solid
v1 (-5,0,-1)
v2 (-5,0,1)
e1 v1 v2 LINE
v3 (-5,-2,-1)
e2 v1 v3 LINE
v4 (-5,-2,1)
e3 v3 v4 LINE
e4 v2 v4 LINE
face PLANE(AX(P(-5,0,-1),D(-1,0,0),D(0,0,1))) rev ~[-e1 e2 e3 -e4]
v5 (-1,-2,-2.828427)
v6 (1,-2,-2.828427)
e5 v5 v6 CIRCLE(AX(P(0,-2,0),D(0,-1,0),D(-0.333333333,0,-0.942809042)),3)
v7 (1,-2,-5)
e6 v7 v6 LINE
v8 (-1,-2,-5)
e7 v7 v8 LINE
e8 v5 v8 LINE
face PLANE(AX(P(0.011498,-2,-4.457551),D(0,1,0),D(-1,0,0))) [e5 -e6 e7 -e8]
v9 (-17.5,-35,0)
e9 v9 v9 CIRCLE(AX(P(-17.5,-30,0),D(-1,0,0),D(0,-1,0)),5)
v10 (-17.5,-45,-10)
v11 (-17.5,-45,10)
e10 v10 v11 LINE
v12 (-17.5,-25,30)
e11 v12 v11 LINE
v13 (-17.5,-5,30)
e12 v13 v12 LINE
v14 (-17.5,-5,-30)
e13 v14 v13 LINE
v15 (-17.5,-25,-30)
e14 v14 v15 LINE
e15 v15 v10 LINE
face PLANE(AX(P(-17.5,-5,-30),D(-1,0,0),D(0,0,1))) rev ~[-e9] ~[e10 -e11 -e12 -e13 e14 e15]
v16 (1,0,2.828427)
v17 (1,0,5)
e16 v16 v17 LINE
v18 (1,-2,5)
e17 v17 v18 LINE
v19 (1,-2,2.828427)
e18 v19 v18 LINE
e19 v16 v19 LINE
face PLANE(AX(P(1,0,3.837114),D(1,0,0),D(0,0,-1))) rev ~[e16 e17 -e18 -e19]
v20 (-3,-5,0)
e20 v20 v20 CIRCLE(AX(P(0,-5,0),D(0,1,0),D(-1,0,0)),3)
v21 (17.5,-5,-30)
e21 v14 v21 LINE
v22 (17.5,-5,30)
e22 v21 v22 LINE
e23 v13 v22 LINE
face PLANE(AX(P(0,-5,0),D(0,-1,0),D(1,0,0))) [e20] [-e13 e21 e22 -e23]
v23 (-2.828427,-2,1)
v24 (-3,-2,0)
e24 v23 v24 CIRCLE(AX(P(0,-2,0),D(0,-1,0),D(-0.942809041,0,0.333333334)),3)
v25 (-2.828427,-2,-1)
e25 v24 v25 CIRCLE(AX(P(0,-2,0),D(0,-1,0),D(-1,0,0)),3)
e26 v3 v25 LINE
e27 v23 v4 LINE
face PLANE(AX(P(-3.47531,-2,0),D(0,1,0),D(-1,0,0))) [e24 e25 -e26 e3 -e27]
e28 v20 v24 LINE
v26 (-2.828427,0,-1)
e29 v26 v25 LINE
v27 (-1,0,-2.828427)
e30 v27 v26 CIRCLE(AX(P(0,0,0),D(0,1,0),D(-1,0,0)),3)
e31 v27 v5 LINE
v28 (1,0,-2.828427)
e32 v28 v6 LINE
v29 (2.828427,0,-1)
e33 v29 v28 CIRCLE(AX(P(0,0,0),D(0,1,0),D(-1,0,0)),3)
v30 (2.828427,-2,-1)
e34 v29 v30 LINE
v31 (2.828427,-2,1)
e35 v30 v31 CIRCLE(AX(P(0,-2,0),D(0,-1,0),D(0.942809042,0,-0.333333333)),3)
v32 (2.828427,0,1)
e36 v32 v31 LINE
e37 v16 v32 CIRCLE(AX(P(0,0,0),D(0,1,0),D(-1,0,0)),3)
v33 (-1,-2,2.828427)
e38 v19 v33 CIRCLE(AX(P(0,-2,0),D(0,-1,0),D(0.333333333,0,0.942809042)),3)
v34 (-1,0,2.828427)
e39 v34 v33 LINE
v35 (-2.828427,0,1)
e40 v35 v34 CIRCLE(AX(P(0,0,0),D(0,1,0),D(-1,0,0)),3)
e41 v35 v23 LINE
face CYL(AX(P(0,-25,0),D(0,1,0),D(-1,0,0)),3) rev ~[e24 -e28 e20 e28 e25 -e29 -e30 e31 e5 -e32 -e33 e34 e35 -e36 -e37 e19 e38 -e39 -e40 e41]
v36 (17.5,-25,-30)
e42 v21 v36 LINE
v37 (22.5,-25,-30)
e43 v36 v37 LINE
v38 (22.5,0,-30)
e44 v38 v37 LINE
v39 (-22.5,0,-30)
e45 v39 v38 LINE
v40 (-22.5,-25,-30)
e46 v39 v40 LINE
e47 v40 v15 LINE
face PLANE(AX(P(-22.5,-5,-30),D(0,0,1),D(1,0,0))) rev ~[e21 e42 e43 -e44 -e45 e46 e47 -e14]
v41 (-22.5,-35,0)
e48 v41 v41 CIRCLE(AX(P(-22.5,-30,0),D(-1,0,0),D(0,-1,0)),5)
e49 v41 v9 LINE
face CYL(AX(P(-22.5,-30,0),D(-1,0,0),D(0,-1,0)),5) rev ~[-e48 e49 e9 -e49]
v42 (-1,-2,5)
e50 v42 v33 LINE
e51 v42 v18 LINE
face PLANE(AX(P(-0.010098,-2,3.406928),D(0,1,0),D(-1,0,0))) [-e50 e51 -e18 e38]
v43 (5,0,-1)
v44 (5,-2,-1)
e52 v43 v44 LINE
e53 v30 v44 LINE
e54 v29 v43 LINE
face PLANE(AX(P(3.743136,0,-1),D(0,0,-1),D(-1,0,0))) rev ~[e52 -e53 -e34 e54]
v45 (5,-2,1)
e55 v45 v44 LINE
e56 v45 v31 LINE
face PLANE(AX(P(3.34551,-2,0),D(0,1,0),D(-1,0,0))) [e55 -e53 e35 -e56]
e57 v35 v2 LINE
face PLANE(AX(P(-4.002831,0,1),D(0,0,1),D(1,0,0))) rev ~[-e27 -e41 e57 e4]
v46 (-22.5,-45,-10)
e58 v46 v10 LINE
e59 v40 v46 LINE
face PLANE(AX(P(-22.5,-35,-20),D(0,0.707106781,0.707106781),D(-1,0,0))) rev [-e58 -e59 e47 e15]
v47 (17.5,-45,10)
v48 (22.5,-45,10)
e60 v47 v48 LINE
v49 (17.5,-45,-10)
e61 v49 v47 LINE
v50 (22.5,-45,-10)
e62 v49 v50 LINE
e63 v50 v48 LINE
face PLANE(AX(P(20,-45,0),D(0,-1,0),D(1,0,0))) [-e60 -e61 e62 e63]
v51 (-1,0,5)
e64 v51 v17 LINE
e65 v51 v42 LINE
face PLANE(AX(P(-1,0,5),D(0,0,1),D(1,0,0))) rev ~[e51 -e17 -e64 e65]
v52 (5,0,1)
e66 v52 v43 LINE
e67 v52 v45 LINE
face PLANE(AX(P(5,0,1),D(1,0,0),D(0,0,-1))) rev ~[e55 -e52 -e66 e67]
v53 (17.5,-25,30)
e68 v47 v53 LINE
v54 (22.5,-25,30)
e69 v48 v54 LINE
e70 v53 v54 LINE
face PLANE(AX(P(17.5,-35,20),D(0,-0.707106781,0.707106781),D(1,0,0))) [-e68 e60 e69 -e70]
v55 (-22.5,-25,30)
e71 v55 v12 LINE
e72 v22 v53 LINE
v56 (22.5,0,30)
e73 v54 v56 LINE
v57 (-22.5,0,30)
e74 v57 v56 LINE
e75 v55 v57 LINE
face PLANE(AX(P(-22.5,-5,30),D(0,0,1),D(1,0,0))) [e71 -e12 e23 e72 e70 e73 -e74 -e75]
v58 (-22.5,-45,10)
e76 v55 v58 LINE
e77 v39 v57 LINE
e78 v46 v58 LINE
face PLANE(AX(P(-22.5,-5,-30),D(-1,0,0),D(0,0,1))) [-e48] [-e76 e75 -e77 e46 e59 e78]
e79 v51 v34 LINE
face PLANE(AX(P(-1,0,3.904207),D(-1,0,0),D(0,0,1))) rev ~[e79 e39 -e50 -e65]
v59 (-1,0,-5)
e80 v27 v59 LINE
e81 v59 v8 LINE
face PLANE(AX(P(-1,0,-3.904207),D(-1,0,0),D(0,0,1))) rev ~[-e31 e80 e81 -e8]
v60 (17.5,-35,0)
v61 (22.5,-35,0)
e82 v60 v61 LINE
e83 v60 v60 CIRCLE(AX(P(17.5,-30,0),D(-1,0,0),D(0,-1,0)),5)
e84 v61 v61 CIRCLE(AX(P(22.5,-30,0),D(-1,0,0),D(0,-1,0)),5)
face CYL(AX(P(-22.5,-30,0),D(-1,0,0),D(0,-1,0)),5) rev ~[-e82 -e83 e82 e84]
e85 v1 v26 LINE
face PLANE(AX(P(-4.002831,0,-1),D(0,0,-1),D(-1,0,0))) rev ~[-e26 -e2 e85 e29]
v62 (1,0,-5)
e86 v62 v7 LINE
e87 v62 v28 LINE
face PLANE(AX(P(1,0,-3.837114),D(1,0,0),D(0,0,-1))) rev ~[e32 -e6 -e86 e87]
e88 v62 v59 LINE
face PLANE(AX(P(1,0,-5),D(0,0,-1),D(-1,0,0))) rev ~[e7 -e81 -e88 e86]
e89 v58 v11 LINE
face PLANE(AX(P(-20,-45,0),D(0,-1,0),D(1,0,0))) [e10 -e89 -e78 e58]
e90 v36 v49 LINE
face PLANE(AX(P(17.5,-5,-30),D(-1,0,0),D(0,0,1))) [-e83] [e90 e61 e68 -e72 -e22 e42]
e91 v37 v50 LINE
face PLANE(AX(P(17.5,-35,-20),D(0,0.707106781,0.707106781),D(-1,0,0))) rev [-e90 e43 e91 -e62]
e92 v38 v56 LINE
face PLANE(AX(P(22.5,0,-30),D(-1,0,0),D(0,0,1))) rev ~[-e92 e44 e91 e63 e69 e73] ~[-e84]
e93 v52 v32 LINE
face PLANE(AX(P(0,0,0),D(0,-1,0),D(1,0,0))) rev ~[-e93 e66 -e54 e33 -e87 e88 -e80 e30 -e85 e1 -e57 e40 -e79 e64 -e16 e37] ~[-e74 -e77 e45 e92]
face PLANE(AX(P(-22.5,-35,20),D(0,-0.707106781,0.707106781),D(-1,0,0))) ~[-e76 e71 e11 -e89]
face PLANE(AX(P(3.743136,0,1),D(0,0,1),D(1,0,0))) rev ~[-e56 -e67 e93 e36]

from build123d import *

# Parameters (mm, degrees)
F0_W      = 45
F0_H      = 60
F1_DEPTH  = 5
F2_W      = 5
F2_H      = 60
F3_DEPTH  = 40
F4_SIZE2  = 20
F4_SIZE   = 20
F5_R      = 5
F6_DEPTH  = 50
F8_D      = 6
F8_DEPTH  = 20
F8_TIP    = 1.8025818571
F10_DEPTH = 2
F11_DEPTH = 2


# Not quite as in the source:
# - after a boolean that leaves OpenCascade's solid faulty, fix() repairs it


with BuildPart() as f1:
    # F0 (on Front) → F1 (new body)
    with BuildSketch(Plane.XZ):
        Rectangle(F0_W, F0_H)
    extrude(amount=F1_DEPTH)

    # F2 (on face) → F3 (join)
    with BuildSketch(Plane.XZ.offset(5)):
        with Locations((-20, 0)):
            Rectangle(F2_W, F2_H)
        with Locations((20, 0)):
            Rectangle(F2_W, F2_H)
    extrude(amount=F3_DEPTH)

    # F4
    f4_edges = [f1.edges().sort_by_distance(p)[0] for p in [
        (20, -45, 30),
        (-20, -45, 30),
        (20, -45, -30),
        (-20, -45, -30),
    ]]
    chamfer(f4_edges, length=F4_SIZE, length2=F4_SIZE2)

    # F5 (on face) → F6 (cut)
    with BuildSketch(Plane(origin=(-22.5, 0, 0), x_dir=(0, -1, 0), z_dir=(-1, 0, 0))):
        with Locations((30, 0)):
            Circle(F5_R)
    extrude(amount=-F6_DEPTH, mode=Mode.SUBTRACT)

    # F8
    with Locations(Plane.XZ.offset(5)):
        with Locations((0, 0)):
            Hole(F8_D / 2, depth=F8_DEPTH)
            with Locations((0, 0, -(F8_DEPTH + F8_TIP / 2))):  # 118° drill point
                Cone(0, F8_D / 2, F8_TIP, mode=Mode.SUBTRACT)

    # F9 (on face) → F10 (cut)
    with BuildSketch(Plane(origin=(0, 0, 0), x_dir=(-1, 0, 0), z_dir=(0, 1, 0))):
        with BuildLine():
            Line((-5, -1), (-3.7431358354, -1))
            ThreePointArc((-3.7431358354, -1), (-3.8701524892, 0), (-3.7431358354, 1))
            Line((-3.7431358354, 1), (-5, 1))
            Line((-5, 1), (-5, -1))
        make_face()
        with BuildLine():
            ThreePointArc((-1, 3.8371140982), (-0.0042634526, 3.997751149), (1, 3.9042073005))
            Line((1, 3.9042073005), (1, 5))
            Line((1, 5), (-1, 5))
            Line((-1, 5), (-1, 3.8371140982))
        make_face()
        with BuildLine():
            Line((4.002830857, -1), (5, -1))
            Line((5, -1), (5, 1))
            Line((5, 1), (4.002830857, 1))
            ThreePointArc((4.002830857, 1), (4.0979662959, 0.5040171699), (4.1298475108, 0))
            ThreePointArc((4.1298475108, 0), (4.0979662959, -0.5040171699), (4.002830857, -1))
        make_face()
        with BuildLine():
            Line((1, -5), (1, -3.9042073005))
            ThreePointArc((1, -3.9042073005), (-0.0042634526, -3.997751149), (-1, -3.8371140982))
            Line((-1, -3.8371140982), (-1, -5))
            Line((-1, -5), (1, -5))
        make_face()
    extrude(amount=-F10_DEPTH, mode=Mode.SUBTRACT)

    # F9 (on face) → F11 (cut)
    with BuildSketch(Plane(origin=(0, 0, 0), x_dir=(-1, 0, 0), z_dir=(0, 1, 0))):
        with BuildLine():
            Line((2.8284271247, -1), (4.002830857, -1))
            ThreePointArc((4.002830857, -1), (4.0979662959, -0.5040171699), (4.1298475108, 0))
            ThreePointArc((4.1298475108, 0), (4.0979662959, 0.5040171699), (4.002830857, 1))
            Line((4.002830857, 1), (2.8284271247, 1))
            ThreePointArc((2.8284271247, 1), (2.956795679, 0.5073059362), (3, 0))
            ThreePointArc((3, 0), (2.956795679, -0.5073059362), (2.8284271247, -1))
        make_face()
        with BuildLine():
            ThreePointArc((-3.7431358354, 1), (-3.8701524892, 0), (-3.7431358354, -1))
            Line((-3.7431358354, -1), (-2.8284271247, -1))
            ThreePointArc((-2.8284271247, -1), (-3, 0), (-2.8284271247, 1))
            Line((-2.8284271247, 1), (-3.7431358354, 1))
        make_face()
        with BuildLine():
            Line((1, 2.8284271247), (1, 3.9042073005))
            ThreePointArc((1, 3.9042073005), (-0.0042634526, 3.997751149), (-1, 3.8371140982))
            Line((-1, 3.8371140982), (-1, 2.8284271247))
            ThreePointArc((-1, 2.8284271247), (0, 3), (1, 2.8284271247))
        make_face()
        with BuildLine():
            ThreePointArc((-1, -3.8371140982), (-0.0042634526, -3.997751149), (1, -3.9042073005))
            Line((1, -3.9042073005), (1, -2.8284271247))
            ThreePointArc((1, -2.8284271247), (0, -3), (-1, -2.8284271247))
            Line((-1, -2.8284271247), (-1, -3.8371140982))
        make_face()
    extrude(amount=-F11_DEPTH, mode=Mode.SUBTRACT)

    add(f1.part.fix(), mode=Mode.REPLACE)


solid = f1.part
